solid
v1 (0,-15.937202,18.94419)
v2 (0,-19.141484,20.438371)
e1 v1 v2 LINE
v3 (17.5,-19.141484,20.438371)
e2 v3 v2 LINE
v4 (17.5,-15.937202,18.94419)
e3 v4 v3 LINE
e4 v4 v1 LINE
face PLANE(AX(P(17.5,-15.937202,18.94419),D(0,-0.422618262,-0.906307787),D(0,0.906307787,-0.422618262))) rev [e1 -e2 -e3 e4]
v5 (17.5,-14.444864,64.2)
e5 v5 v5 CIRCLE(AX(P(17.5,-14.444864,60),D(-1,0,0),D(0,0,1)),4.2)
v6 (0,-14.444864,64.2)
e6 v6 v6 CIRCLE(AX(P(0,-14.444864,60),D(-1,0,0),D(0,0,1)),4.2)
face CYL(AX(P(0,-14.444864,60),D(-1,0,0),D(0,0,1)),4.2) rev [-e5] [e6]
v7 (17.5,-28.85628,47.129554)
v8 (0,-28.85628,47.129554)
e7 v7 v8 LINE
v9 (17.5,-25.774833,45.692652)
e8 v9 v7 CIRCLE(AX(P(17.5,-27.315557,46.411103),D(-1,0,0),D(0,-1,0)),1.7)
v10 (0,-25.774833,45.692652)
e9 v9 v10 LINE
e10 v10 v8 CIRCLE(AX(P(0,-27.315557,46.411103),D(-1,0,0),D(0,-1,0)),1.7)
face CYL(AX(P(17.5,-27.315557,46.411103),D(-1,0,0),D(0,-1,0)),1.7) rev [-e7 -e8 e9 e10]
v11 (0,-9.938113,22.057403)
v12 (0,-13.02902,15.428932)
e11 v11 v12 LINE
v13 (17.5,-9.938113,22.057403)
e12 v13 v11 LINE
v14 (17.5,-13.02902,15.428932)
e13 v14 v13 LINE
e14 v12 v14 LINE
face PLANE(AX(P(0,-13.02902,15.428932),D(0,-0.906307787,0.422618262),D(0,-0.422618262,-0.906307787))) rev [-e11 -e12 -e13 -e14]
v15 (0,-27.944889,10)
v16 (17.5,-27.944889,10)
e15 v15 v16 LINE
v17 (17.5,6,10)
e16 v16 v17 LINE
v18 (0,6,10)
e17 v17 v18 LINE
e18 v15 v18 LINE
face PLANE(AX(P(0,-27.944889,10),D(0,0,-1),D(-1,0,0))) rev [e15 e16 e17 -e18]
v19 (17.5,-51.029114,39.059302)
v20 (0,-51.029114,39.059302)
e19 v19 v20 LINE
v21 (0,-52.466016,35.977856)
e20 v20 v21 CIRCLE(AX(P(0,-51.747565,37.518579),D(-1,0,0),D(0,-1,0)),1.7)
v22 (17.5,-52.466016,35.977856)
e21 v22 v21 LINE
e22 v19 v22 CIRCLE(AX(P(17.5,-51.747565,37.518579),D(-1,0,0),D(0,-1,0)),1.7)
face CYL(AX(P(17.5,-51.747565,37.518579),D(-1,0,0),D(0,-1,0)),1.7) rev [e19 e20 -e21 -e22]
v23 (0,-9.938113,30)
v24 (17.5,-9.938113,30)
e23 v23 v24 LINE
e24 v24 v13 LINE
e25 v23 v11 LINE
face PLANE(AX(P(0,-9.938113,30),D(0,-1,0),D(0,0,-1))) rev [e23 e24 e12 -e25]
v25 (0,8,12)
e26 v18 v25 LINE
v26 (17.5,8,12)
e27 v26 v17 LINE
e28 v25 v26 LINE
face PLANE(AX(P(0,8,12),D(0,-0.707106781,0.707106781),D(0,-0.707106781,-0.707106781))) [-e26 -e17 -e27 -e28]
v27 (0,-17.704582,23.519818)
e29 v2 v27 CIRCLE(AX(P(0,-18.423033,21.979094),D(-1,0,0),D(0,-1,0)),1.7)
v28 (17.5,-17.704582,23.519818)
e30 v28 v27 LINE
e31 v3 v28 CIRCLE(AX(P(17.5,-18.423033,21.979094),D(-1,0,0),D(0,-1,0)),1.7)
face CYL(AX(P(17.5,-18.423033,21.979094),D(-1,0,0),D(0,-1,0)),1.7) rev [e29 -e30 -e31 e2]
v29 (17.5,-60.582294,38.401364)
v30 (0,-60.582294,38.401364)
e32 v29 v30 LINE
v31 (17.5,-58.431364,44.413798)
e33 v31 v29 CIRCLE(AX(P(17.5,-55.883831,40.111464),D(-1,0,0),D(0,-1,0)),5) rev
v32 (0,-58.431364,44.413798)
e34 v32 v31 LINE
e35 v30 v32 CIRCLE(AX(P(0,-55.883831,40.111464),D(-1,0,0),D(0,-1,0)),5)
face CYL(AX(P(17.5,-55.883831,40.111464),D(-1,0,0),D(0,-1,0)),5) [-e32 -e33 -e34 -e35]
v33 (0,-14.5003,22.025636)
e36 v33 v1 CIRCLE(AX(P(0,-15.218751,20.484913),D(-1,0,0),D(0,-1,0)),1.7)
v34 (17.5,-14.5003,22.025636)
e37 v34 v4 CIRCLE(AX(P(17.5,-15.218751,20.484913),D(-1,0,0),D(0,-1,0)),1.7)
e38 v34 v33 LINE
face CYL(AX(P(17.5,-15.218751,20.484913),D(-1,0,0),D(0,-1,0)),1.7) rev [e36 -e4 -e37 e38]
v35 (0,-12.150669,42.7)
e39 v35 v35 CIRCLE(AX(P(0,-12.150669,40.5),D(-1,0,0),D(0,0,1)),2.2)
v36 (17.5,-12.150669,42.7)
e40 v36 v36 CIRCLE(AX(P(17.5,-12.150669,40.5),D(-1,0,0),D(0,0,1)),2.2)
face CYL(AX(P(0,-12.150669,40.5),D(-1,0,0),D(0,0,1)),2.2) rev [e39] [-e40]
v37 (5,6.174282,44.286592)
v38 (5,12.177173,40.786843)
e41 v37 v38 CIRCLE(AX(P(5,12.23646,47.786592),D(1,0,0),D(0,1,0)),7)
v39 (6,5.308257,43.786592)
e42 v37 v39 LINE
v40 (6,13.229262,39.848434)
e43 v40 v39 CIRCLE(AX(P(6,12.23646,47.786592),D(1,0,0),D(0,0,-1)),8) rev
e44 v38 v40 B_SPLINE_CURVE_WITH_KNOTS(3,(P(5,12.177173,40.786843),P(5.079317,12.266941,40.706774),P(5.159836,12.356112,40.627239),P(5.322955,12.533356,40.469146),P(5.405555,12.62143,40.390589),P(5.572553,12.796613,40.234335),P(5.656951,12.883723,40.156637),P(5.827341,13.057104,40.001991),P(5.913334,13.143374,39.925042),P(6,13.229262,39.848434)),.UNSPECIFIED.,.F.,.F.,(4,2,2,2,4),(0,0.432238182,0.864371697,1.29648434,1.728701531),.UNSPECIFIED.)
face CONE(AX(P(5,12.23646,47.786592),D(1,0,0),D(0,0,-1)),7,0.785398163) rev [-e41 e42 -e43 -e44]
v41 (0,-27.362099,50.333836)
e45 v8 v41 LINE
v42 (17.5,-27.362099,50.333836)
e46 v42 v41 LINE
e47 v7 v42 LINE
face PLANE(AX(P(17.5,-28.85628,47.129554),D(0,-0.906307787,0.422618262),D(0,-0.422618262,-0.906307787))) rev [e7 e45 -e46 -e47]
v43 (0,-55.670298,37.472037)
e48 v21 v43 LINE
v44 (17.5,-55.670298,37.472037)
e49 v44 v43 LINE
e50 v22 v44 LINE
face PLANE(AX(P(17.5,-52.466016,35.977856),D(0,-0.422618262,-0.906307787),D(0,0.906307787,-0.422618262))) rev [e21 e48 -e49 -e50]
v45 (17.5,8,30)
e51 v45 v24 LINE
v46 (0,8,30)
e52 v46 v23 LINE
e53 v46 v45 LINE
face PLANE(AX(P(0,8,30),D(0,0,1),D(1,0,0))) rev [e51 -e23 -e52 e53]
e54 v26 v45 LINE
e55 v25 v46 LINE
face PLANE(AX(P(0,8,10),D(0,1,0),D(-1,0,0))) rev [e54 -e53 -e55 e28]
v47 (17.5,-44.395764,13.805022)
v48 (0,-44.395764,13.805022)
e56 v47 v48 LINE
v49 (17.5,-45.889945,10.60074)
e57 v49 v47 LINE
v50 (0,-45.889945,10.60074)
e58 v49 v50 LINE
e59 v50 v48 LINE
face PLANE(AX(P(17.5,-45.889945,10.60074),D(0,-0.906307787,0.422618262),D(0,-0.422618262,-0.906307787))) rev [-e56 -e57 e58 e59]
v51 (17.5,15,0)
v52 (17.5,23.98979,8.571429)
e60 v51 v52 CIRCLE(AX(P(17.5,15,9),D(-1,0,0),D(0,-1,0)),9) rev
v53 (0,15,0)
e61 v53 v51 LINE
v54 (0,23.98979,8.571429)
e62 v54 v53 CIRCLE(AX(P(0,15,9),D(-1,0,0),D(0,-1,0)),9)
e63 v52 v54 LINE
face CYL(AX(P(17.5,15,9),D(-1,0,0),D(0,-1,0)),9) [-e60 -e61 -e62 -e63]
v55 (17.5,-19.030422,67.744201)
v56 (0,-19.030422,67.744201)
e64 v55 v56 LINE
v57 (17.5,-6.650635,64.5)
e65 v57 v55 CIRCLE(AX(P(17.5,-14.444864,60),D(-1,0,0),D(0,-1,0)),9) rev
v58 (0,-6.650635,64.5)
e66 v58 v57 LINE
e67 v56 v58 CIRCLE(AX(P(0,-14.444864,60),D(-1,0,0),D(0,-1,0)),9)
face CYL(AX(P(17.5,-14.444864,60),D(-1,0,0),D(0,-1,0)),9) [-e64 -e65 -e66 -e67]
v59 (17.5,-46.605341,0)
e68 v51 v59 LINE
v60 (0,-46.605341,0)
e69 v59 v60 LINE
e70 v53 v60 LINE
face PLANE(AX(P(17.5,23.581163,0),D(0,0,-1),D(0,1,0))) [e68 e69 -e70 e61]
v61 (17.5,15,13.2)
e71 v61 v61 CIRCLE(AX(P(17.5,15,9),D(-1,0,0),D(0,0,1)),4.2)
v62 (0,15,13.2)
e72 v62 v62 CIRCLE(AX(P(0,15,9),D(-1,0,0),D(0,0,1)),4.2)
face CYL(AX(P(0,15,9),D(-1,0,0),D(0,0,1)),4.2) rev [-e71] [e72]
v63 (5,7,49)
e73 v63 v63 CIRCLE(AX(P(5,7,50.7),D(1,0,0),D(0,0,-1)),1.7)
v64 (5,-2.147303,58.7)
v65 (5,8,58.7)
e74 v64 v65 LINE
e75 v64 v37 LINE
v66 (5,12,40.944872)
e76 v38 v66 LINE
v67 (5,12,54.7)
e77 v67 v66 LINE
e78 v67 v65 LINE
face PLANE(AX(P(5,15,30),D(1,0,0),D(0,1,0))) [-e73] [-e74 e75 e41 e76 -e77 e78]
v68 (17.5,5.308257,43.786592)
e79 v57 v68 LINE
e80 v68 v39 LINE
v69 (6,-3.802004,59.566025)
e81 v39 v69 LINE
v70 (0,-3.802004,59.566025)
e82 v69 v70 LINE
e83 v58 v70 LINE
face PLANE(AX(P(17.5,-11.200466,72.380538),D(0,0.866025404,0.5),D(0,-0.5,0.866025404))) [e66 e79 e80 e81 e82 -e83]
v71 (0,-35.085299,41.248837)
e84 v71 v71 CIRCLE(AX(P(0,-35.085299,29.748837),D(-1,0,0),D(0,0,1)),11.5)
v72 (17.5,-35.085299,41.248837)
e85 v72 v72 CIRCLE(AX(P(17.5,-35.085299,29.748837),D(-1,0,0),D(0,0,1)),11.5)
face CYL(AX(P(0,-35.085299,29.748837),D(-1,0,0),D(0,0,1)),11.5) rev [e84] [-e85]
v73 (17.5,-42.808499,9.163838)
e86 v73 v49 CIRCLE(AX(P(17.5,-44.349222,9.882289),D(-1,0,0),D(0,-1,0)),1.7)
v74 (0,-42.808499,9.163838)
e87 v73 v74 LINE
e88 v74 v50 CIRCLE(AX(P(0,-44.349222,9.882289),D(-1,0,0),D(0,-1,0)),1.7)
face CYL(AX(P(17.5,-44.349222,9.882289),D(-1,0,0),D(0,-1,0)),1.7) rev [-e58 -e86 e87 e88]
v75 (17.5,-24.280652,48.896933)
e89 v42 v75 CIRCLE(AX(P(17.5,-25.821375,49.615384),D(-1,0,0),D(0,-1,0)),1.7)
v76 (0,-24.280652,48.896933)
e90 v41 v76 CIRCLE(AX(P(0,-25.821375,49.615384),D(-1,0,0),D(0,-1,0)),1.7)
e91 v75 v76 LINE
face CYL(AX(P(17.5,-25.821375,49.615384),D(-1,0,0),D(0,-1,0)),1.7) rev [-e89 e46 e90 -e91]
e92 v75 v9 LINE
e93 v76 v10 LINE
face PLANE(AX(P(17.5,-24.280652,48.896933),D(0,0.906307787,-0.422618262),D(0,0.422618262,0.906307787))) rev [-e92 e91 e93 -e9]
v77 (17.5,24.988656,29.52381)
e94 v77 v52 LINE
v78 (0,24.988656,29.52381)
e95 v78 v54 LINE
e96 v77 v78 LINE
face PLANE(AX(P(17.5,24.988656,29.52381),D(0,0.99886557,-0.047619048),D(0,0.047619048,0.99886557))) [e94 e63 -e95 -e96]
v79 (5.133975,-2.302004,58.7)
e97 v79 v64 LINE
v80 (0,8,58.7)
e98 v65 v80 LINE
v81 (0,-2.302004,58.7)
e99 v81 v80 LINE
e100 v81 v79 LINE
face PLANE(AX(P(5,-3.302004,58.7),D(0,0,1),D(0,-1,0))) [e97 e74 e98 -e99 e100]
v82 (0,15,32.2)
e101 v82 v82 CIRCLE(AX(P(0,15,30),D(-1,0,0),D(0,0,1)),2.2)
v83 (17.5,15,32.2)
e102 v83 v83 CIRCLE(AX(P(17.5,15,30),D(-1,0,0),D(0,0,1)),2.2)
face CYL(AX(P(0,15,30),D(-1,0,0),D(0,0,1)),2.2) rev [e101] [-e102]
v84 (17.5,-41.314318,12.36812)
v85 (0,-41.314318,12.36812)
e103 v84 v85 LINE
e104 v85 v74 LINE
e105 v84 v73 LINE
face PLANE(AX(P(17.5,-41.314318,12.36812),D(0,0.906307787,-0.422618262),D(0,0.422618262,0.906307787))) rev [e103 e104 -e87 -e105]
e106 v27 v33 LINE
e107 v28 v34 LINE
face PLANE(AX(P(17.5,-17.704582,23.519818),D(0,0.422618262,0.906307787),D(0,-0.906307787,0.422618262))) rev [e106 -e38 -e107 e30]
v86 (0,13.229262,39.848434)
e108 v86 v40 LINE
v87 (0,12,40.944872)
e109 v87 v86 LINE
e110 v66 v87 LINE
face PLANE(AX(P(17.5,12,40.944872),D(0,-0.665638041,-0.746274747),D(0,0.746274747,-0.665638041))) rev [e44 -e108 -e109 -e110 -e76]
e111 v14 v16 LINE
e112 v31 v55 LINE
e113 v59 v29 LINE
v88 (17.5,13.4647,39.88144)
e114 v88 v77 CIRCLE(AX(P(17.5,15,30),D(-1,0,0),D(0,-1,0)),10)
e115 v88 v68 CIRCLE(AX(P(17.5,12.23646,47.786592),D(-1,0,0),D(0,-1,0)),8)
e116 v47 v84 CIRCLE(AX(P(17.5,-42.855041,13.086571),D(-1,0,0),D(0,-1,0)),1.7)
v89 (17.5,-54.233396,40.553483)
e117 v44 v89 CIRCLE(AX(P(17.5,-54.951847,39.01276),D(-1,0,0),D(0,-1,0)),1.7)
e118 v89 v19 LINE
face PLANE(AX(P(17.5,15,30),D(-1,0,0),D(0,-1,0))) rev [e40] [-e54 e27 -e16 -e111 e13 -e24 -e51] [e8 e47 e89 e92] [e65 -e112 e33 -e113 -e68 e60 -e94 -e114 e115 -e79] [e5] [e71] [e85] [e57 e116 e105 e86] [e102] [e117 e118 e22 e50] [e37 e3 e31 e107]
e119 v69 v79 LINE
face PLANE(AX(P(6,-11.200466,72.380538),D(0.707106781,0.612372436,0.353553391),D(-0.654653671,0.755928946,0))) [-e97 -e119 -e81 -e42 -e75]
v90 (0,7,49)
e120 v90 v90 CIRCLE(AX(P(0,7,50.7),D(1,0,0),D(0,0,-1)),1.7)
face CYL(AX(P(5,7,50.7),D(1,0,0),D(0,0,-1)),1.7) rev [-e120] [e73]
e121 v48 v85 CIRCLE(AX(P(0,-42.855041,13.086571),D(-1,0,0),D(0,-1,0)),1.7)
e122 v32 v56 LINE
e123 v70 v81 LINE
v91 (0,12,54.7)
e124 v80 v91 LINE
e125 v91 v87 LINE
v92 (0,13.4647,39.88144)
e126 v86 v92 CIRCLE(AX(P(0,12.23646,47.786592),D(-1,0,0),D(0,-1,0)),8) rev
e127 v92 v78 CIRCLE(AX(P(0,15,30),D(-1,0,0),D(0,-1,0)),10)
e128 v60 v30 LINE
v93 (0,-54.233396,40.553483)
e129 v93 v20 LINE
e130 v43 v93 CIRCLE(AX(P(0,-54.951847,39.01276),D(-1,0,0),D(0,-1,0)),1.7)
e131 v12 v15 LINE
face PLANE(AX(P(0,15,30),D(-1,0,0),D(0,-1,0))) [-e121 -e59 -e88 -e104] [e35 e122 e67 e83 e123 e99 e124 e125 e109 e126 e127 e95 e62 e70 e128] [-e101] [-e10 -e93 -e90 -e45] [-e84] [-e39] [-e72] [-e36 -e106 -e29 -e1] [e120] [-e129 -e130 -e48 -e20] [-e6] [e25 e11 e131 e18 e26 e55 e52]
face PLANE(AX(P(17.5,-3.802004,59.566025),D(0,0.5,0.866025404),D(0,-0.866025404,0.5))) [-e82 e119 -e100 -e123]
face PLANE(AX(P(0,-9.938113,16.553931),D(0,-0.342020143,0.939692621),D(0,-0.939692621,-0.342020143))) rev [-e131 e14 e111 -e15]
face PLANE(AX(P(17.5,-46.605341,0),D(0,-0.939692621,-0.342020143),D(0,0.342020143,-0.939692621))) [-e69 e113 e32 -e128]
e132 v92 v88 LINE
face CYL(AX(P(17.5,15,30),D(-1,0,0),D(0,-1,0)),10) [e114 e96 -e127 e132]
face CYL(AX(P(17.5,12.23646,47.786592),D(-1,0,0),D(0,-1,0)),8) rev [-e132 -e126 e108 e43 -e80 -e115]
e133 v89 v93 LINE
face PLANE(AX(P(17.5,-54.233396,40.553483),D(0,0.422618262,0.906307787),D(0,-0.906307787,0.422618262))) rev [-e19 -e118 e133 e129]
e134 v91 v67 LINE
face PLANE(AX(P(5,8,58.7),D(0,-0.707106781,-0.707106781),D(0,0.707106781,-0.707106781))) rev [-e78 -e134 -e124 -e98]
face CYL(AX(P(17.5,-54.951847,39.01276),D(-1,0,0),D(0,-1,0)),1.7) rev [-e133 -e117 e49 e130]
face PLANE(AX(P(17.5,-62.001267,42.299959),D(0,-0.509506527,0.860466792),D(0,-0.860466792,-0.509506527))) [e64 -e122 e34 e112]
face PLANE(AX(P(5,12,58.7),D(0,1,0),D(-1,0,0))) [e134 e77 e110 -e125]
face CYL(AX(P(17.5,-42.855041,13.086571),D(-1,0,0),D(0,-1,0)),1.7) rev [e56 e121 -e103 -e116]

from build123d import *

# Parameters (mm, degrees)
BOSS_EXTRUDE1_DEPTH = 17.5
BOSS_EXTRUDE2_DEPTH = 5
CUT_EXTRUDE1_DEPTH  = 97.89865525603899
CUT_EXTRUDE2_DEPTH  = 97.89865525603899
CUT_EXTRUDE3_DEPTH  = 97.89865525603899
CUT_EXTRUDE4_DEPTH  = 97.89865525603899
CUT_EXTRUDE5_DEPTH  = 97.898655256039
HOLE1_D             = 3.4
HOLE2_D             = 8.4
HOLE3_D             = 4.4
HOLE4_D             = 23
HOLE5_D             = 8.4
HOLE6_D             = 4.4
FILLET1_R           = 8
CHAMFER1_SIZE       = 3.2892742843300167
CHAMFER1_SIZE2      = 5.503472902596259
CHAMFER2_SIZE       = 1.0000000000000073
CHAMFER3_SIZE       = 3.9999999999999973
CHAMFER4_SIZE       = 1.9999999999999982
CHAMFER5_SIZE       = 1.154784669
CHAMFER6_SIZE       = 0.9999999999999983
FILLET2_R           = 5
FILLET3_R           = 8.99999999999999
FILLET4_R           = 9.000000000000002


with BuildPart() as part:
    # Sketch1 → Boss-Extrude1 (new body)
    with BuildSketch(Plane(origin=(0, 0, 0), x_dir=(-6e-17, -1, 0), z_dir=(-1, 6e-17, 0))):
        with BuildLine():
            Line((11.200465877219063, 72.38053808131822), (-8.757531911002138, 37.812271894771776))
            ThreePointArc((-8.757531911002138, 37.812271894771776), (-19.5478712071735, 38.906001767514), (-24.988655696858714, 29.523809523809472))
            Line((-24.988655696858714, 29.523809523809472), (-23.581163303210467, 5.42e-15))
            Line((-23.581163303210467, 5.42e-15), (46.60534104687875, -6.94e-15))
            Line((46.60534104687875, -6.94e-15), (62.00126690227817, 42.299958639307405))
            Line((62.00126690227817, 42.299958639307405), (11.200465877219063, 72.38053808131822))
        make_face()
    extrude(amount=-BOSS_EXTRUDE1_DEPTH)

    # Sketch2 → Boss-Extrude2 (add)
    with BuildSketch(Plane(origin=(0, 0, 0), x_dir=(-6e-17, -1, 0), z_dir=(-1, 6e-17, 0))):
        with BuildLine():
            Line((-8.757531911002138, 37.812271894771776), (3.3020035333110394, 58.69999999999994))
            Line((3.3020035333110394, 58.69999999999994), (-12.000000000000004, 58.699999999999946))
            Line((-12.000000000000004, 58.699999999999946), (-12.000000000000004, 39.539392014169366))
            ThreePointArc((-12.000000000000004, 39.539392014169366), (-10.298772493194686, 38.826010419734104), (-8.757531911002138, 37.812271894771776))
        make_face()
    extrude(amount=-BOSS_EXTRUDE2_DEPTH)

    # Sketch3 → Cut-Extrude1 (cut, through all)
    with BuildSketch(Plane.ZY):
        with BuildLine():
            Line((18.94418997404675, -15.937202057164905), (20.43837116769735, -19.141483967443826))
            ThreePointArc((20.43837116769735, -19.141483967443826), (22.697545450618843, -19.96375616044696), (23.519817643621966, -17.70458187752546))
            Line((23.519817643621966, -17.70458187752546), (22.02563644997135, -14.500299967246516))
            ThreePointArc((22.02563644997135, -14.500299967246516), (19.766462167049855, -13.67802777424341), (18.94418997404675, -15.937202057164905))
        make_face()
    extrude(amount=-CUT_EXTRUDE1_DEPTH, mode=Mode.SUBTRACT)

    # Sketch4 → Cut-Extrude2 (cut, through all)
    with BuildSketch(Plane.ZY):
        with BuildLine():
            Line((48.89693341141304, -24.280652217339153), (45.692651501134065, -25.774833410989757))
            ThreePointArc((45.692651501134065, -25.774833410989757), (44.87037930813095, -28.034007693911235), (47.12955359105242, -28.85627988691438))
            Line((47.12955359105242, -28.85627988691438), (50.33383550133139, -27.362098693263775))
            ThreePointArc((50.33383550133139, -27.362098693263775), (51.156107694334516, -25.102924410342293), (48.89693341141304, -24.280652217339153))
        make_face()
    extrude(amount=-CUT_EXTRUDE2_DEPTH, mode=Mode.SUBTRACT)

    # Sketch5 → Cut-Extrude3 (cut, through all)
    with BuildSketch(Plane.ZY):
        with BuildLine():
            Line((35.97785558166356, -52.46601583434486), (37.47203677531419, -55.6702977446238))
            ThreePointArc((37.47203677531419, -55.6702977446238), (39.73121105823568, -56.4925699376269), (40.55348325123879, -54.233395654705404))
            Line((40.55348325123879, -54.233395654705404), (39.059302057588205, -51.02911374442645))
            ThreePointArc((39.059302057588205, -51.02911374442645), (36.80012777466672, -50.20684155142337), (35.97785558166356, -52.46601583434486))
        make_face()
    extrude(amount=-CUT_EXTRUDE3_DEPTH, mode=Mode.SUBTRACT)

    # Sketch6 → Cut-Extrude4 (cut, through all)
    with BuildSketch(Plane.ZY):
        with BuildLine():
            Line((10.600739813872503, -45.8899454945312), (13.805021724151473, -44.395764300880586))
            ThreePointArc((13.805021724151473, -44.395764300880586), (14.627293917154569, -42.136590017959094), (12.36811963423308, -41.314317824955985))
            Line((12.36811963423308, -41.314317824955985), (9.163837723954103, -42.8084990186066))
            ThreePointArc((9.163837723954103, -42.8084990186066), (8.341565530951023, -45.06767330152808), (10.600739813872503, -45.8899454945312))
        make_face()
    extrude(amount=-CUT_EXTRUDE4_DEPTH, mode=Mode.SUBTRACT)

    # Sketch7 → Cut-Extrude5 (cut, through all)
    with BuildSketch(Plane(origin=(17.5, -1.07e-15, 0), x_dir=(0, 0, -1), z_dir=(1, -6e-17, 0))):
        Polygon((-30.000000000000007, 8.000000000000005), (-30.000000000000007, -9.938112905604582), (-16.55393055212617, -9.938112905604578), (-10.000000000000002, -27.94488910624502), (-10.000000000000002, 8.000000000000005), align=None)
    extrude(amount=-CUT_EXTRUDE5_DEPTH, mode=Mode.SUBTRACT)

    # Hole1 (through all)
    with Locations(Plane(origin=(5, -3.1e-16, 0), x_dir=(0, 0, -1), z_dir=(1, -6e-17, 0))):
        with Locations((-50.7, 7)):
            Hole(HOLE1_D / 2)

    # Hole2 (through all)
    with Locations(Plane.ZY):
        with Locations((9, 15)):
            Hole(HOLE2_D / 2)

    # Hole3 (through all)
    with Locations(Plane.ZY):
        with Locations((40.5, -12.150669091)):
            Hole(HOLE3_D / 2)

    # Hole4 (through all)
    with Locations(Plane.ZY):
        with Locations((29.748836613, -35.085298856)):
            Hole(HOLE4_D / 2)

    # Hole5 (through all)
    with Locations(Plane.ZY):
        with Locations((60, -14.444863729)):
            Hole(HOLE5_D / 2)

    # Hole6 (through all)
    with Locations(Plane.ZY):
        with Locations((30, 15)):
            Hole(HOLE6_D / 2)

    # Fillet1
    fillet1_edges = [part.edges().sort_by_distance(p)[0] for p in [
        (11.25, 8.757531911002138, 37.812271894771776),
    ]]
    fillet(fillet1_edges, radius=FILLET1_R)

    # Chamfer1
    chamfer1_edges = [part.edges().sort_by_distance(p)[0] for p in [
        (8.75, -9.93811290560458, 16.55393055212617),
    ]]
    chamfer1_side = [part.faces().sort_by_distance(p)[0] for p in [
        (8.750000000000002, -18.941501005924803, 13.276965276063088),
    ]]
    chamfer(chamfer1_edges, length=CHAMFER1_SIZE, length2=CHAMFER1_SIZE2, reference=chamfer1_side[0])

    # Chamfer2
    chamfer2_edges = [part.edges().sort_by_distance(p)[0] for p in [
        (2.5, -3.3020035333110394, 58.69999999999994),
    ]]
    chamfer(chamfer2_edges, length=CHAMFER2_SIZE)

    # Chamfer3
    chamfer3_edges = [part.edges().sort_by_distance(p)[0] for p in [
        (2.500000000000001, 12.000000000000004, 58.699999999999946),
    ]]
    chamfer(chamfer3_edges, length=CHAMFER3_SIZE)

    # Chamfer4
    chamfer4_edges = [part.edges().sort_by_distance(p)[0] for p in [
        (8.75, 8.000000000000004, 10.000000000000002),
    ]]
    chamfer(chamfer4_edges, length=CHAMFER4_SIZE)

    # Chamfer5
    # the kernel refuses this chamfer: 1.339656624, 1.154784669 mm, written as the material it adds along each edge
    with BuildSketch(Plane(origin=(5.000000000000001, 12.000000000000004, 39.790087105703904), x_dir=(0, 0, 1), z_dir=(-1, 6e-17, 0))) as chamfer5_piece_1:
        with BuildLine():
            Line((CHAMFER5_SIZE, 0), (0.05834718904861802, 1.2292620817061763))
            ThreePointArc((0.05834718904861802, 1.2292620817061763), (0.00643151248669227, 0.6348707855031801), (0, 0))
            Line((0, 0), (CHAMFER5_SIZE, 0))
        make_face()
    extrude(amount=5)

    # Chamfer6
    chamfer6_edges = [part.edges().sort_by_distance(p)[0] for p in [
        (5.000000000000001, 0.7531265976075634, 51.67630858194548),
        (5, 8.674926913627807, 40.6231092014468),
    ]]
    chamfer(chamfer6_edges, length=CHAMFER6_SIZE)

    # Fillet2
    fillet2_edges = [part.edges().sort_by_distance(p)[0] for p in [
        (8.749999999999996, -62.00126690227817, 42.299958639307405),
    ]]
    fillet(fillet2_edges, radius=FILLET2_R)

    # Fillet3
    fillet3_edges = [part.edges().sort_by_distance(p)[0] for p in [
        (8.75, -11.200465877219063, 72.38053808131822),
    ]]
    fillet(fillet3_edges, radius=FILLET3_R)

    # Fillet4
    fillet4_edges = [part.edges().sort_by_distance(p)[0] for p in [
        (8.750000000000002, 23.581163303210467, 5.42e-15),
    ]]
    fillet(fillet4_edges, radius=FILLET4_R)


solid = part.part
